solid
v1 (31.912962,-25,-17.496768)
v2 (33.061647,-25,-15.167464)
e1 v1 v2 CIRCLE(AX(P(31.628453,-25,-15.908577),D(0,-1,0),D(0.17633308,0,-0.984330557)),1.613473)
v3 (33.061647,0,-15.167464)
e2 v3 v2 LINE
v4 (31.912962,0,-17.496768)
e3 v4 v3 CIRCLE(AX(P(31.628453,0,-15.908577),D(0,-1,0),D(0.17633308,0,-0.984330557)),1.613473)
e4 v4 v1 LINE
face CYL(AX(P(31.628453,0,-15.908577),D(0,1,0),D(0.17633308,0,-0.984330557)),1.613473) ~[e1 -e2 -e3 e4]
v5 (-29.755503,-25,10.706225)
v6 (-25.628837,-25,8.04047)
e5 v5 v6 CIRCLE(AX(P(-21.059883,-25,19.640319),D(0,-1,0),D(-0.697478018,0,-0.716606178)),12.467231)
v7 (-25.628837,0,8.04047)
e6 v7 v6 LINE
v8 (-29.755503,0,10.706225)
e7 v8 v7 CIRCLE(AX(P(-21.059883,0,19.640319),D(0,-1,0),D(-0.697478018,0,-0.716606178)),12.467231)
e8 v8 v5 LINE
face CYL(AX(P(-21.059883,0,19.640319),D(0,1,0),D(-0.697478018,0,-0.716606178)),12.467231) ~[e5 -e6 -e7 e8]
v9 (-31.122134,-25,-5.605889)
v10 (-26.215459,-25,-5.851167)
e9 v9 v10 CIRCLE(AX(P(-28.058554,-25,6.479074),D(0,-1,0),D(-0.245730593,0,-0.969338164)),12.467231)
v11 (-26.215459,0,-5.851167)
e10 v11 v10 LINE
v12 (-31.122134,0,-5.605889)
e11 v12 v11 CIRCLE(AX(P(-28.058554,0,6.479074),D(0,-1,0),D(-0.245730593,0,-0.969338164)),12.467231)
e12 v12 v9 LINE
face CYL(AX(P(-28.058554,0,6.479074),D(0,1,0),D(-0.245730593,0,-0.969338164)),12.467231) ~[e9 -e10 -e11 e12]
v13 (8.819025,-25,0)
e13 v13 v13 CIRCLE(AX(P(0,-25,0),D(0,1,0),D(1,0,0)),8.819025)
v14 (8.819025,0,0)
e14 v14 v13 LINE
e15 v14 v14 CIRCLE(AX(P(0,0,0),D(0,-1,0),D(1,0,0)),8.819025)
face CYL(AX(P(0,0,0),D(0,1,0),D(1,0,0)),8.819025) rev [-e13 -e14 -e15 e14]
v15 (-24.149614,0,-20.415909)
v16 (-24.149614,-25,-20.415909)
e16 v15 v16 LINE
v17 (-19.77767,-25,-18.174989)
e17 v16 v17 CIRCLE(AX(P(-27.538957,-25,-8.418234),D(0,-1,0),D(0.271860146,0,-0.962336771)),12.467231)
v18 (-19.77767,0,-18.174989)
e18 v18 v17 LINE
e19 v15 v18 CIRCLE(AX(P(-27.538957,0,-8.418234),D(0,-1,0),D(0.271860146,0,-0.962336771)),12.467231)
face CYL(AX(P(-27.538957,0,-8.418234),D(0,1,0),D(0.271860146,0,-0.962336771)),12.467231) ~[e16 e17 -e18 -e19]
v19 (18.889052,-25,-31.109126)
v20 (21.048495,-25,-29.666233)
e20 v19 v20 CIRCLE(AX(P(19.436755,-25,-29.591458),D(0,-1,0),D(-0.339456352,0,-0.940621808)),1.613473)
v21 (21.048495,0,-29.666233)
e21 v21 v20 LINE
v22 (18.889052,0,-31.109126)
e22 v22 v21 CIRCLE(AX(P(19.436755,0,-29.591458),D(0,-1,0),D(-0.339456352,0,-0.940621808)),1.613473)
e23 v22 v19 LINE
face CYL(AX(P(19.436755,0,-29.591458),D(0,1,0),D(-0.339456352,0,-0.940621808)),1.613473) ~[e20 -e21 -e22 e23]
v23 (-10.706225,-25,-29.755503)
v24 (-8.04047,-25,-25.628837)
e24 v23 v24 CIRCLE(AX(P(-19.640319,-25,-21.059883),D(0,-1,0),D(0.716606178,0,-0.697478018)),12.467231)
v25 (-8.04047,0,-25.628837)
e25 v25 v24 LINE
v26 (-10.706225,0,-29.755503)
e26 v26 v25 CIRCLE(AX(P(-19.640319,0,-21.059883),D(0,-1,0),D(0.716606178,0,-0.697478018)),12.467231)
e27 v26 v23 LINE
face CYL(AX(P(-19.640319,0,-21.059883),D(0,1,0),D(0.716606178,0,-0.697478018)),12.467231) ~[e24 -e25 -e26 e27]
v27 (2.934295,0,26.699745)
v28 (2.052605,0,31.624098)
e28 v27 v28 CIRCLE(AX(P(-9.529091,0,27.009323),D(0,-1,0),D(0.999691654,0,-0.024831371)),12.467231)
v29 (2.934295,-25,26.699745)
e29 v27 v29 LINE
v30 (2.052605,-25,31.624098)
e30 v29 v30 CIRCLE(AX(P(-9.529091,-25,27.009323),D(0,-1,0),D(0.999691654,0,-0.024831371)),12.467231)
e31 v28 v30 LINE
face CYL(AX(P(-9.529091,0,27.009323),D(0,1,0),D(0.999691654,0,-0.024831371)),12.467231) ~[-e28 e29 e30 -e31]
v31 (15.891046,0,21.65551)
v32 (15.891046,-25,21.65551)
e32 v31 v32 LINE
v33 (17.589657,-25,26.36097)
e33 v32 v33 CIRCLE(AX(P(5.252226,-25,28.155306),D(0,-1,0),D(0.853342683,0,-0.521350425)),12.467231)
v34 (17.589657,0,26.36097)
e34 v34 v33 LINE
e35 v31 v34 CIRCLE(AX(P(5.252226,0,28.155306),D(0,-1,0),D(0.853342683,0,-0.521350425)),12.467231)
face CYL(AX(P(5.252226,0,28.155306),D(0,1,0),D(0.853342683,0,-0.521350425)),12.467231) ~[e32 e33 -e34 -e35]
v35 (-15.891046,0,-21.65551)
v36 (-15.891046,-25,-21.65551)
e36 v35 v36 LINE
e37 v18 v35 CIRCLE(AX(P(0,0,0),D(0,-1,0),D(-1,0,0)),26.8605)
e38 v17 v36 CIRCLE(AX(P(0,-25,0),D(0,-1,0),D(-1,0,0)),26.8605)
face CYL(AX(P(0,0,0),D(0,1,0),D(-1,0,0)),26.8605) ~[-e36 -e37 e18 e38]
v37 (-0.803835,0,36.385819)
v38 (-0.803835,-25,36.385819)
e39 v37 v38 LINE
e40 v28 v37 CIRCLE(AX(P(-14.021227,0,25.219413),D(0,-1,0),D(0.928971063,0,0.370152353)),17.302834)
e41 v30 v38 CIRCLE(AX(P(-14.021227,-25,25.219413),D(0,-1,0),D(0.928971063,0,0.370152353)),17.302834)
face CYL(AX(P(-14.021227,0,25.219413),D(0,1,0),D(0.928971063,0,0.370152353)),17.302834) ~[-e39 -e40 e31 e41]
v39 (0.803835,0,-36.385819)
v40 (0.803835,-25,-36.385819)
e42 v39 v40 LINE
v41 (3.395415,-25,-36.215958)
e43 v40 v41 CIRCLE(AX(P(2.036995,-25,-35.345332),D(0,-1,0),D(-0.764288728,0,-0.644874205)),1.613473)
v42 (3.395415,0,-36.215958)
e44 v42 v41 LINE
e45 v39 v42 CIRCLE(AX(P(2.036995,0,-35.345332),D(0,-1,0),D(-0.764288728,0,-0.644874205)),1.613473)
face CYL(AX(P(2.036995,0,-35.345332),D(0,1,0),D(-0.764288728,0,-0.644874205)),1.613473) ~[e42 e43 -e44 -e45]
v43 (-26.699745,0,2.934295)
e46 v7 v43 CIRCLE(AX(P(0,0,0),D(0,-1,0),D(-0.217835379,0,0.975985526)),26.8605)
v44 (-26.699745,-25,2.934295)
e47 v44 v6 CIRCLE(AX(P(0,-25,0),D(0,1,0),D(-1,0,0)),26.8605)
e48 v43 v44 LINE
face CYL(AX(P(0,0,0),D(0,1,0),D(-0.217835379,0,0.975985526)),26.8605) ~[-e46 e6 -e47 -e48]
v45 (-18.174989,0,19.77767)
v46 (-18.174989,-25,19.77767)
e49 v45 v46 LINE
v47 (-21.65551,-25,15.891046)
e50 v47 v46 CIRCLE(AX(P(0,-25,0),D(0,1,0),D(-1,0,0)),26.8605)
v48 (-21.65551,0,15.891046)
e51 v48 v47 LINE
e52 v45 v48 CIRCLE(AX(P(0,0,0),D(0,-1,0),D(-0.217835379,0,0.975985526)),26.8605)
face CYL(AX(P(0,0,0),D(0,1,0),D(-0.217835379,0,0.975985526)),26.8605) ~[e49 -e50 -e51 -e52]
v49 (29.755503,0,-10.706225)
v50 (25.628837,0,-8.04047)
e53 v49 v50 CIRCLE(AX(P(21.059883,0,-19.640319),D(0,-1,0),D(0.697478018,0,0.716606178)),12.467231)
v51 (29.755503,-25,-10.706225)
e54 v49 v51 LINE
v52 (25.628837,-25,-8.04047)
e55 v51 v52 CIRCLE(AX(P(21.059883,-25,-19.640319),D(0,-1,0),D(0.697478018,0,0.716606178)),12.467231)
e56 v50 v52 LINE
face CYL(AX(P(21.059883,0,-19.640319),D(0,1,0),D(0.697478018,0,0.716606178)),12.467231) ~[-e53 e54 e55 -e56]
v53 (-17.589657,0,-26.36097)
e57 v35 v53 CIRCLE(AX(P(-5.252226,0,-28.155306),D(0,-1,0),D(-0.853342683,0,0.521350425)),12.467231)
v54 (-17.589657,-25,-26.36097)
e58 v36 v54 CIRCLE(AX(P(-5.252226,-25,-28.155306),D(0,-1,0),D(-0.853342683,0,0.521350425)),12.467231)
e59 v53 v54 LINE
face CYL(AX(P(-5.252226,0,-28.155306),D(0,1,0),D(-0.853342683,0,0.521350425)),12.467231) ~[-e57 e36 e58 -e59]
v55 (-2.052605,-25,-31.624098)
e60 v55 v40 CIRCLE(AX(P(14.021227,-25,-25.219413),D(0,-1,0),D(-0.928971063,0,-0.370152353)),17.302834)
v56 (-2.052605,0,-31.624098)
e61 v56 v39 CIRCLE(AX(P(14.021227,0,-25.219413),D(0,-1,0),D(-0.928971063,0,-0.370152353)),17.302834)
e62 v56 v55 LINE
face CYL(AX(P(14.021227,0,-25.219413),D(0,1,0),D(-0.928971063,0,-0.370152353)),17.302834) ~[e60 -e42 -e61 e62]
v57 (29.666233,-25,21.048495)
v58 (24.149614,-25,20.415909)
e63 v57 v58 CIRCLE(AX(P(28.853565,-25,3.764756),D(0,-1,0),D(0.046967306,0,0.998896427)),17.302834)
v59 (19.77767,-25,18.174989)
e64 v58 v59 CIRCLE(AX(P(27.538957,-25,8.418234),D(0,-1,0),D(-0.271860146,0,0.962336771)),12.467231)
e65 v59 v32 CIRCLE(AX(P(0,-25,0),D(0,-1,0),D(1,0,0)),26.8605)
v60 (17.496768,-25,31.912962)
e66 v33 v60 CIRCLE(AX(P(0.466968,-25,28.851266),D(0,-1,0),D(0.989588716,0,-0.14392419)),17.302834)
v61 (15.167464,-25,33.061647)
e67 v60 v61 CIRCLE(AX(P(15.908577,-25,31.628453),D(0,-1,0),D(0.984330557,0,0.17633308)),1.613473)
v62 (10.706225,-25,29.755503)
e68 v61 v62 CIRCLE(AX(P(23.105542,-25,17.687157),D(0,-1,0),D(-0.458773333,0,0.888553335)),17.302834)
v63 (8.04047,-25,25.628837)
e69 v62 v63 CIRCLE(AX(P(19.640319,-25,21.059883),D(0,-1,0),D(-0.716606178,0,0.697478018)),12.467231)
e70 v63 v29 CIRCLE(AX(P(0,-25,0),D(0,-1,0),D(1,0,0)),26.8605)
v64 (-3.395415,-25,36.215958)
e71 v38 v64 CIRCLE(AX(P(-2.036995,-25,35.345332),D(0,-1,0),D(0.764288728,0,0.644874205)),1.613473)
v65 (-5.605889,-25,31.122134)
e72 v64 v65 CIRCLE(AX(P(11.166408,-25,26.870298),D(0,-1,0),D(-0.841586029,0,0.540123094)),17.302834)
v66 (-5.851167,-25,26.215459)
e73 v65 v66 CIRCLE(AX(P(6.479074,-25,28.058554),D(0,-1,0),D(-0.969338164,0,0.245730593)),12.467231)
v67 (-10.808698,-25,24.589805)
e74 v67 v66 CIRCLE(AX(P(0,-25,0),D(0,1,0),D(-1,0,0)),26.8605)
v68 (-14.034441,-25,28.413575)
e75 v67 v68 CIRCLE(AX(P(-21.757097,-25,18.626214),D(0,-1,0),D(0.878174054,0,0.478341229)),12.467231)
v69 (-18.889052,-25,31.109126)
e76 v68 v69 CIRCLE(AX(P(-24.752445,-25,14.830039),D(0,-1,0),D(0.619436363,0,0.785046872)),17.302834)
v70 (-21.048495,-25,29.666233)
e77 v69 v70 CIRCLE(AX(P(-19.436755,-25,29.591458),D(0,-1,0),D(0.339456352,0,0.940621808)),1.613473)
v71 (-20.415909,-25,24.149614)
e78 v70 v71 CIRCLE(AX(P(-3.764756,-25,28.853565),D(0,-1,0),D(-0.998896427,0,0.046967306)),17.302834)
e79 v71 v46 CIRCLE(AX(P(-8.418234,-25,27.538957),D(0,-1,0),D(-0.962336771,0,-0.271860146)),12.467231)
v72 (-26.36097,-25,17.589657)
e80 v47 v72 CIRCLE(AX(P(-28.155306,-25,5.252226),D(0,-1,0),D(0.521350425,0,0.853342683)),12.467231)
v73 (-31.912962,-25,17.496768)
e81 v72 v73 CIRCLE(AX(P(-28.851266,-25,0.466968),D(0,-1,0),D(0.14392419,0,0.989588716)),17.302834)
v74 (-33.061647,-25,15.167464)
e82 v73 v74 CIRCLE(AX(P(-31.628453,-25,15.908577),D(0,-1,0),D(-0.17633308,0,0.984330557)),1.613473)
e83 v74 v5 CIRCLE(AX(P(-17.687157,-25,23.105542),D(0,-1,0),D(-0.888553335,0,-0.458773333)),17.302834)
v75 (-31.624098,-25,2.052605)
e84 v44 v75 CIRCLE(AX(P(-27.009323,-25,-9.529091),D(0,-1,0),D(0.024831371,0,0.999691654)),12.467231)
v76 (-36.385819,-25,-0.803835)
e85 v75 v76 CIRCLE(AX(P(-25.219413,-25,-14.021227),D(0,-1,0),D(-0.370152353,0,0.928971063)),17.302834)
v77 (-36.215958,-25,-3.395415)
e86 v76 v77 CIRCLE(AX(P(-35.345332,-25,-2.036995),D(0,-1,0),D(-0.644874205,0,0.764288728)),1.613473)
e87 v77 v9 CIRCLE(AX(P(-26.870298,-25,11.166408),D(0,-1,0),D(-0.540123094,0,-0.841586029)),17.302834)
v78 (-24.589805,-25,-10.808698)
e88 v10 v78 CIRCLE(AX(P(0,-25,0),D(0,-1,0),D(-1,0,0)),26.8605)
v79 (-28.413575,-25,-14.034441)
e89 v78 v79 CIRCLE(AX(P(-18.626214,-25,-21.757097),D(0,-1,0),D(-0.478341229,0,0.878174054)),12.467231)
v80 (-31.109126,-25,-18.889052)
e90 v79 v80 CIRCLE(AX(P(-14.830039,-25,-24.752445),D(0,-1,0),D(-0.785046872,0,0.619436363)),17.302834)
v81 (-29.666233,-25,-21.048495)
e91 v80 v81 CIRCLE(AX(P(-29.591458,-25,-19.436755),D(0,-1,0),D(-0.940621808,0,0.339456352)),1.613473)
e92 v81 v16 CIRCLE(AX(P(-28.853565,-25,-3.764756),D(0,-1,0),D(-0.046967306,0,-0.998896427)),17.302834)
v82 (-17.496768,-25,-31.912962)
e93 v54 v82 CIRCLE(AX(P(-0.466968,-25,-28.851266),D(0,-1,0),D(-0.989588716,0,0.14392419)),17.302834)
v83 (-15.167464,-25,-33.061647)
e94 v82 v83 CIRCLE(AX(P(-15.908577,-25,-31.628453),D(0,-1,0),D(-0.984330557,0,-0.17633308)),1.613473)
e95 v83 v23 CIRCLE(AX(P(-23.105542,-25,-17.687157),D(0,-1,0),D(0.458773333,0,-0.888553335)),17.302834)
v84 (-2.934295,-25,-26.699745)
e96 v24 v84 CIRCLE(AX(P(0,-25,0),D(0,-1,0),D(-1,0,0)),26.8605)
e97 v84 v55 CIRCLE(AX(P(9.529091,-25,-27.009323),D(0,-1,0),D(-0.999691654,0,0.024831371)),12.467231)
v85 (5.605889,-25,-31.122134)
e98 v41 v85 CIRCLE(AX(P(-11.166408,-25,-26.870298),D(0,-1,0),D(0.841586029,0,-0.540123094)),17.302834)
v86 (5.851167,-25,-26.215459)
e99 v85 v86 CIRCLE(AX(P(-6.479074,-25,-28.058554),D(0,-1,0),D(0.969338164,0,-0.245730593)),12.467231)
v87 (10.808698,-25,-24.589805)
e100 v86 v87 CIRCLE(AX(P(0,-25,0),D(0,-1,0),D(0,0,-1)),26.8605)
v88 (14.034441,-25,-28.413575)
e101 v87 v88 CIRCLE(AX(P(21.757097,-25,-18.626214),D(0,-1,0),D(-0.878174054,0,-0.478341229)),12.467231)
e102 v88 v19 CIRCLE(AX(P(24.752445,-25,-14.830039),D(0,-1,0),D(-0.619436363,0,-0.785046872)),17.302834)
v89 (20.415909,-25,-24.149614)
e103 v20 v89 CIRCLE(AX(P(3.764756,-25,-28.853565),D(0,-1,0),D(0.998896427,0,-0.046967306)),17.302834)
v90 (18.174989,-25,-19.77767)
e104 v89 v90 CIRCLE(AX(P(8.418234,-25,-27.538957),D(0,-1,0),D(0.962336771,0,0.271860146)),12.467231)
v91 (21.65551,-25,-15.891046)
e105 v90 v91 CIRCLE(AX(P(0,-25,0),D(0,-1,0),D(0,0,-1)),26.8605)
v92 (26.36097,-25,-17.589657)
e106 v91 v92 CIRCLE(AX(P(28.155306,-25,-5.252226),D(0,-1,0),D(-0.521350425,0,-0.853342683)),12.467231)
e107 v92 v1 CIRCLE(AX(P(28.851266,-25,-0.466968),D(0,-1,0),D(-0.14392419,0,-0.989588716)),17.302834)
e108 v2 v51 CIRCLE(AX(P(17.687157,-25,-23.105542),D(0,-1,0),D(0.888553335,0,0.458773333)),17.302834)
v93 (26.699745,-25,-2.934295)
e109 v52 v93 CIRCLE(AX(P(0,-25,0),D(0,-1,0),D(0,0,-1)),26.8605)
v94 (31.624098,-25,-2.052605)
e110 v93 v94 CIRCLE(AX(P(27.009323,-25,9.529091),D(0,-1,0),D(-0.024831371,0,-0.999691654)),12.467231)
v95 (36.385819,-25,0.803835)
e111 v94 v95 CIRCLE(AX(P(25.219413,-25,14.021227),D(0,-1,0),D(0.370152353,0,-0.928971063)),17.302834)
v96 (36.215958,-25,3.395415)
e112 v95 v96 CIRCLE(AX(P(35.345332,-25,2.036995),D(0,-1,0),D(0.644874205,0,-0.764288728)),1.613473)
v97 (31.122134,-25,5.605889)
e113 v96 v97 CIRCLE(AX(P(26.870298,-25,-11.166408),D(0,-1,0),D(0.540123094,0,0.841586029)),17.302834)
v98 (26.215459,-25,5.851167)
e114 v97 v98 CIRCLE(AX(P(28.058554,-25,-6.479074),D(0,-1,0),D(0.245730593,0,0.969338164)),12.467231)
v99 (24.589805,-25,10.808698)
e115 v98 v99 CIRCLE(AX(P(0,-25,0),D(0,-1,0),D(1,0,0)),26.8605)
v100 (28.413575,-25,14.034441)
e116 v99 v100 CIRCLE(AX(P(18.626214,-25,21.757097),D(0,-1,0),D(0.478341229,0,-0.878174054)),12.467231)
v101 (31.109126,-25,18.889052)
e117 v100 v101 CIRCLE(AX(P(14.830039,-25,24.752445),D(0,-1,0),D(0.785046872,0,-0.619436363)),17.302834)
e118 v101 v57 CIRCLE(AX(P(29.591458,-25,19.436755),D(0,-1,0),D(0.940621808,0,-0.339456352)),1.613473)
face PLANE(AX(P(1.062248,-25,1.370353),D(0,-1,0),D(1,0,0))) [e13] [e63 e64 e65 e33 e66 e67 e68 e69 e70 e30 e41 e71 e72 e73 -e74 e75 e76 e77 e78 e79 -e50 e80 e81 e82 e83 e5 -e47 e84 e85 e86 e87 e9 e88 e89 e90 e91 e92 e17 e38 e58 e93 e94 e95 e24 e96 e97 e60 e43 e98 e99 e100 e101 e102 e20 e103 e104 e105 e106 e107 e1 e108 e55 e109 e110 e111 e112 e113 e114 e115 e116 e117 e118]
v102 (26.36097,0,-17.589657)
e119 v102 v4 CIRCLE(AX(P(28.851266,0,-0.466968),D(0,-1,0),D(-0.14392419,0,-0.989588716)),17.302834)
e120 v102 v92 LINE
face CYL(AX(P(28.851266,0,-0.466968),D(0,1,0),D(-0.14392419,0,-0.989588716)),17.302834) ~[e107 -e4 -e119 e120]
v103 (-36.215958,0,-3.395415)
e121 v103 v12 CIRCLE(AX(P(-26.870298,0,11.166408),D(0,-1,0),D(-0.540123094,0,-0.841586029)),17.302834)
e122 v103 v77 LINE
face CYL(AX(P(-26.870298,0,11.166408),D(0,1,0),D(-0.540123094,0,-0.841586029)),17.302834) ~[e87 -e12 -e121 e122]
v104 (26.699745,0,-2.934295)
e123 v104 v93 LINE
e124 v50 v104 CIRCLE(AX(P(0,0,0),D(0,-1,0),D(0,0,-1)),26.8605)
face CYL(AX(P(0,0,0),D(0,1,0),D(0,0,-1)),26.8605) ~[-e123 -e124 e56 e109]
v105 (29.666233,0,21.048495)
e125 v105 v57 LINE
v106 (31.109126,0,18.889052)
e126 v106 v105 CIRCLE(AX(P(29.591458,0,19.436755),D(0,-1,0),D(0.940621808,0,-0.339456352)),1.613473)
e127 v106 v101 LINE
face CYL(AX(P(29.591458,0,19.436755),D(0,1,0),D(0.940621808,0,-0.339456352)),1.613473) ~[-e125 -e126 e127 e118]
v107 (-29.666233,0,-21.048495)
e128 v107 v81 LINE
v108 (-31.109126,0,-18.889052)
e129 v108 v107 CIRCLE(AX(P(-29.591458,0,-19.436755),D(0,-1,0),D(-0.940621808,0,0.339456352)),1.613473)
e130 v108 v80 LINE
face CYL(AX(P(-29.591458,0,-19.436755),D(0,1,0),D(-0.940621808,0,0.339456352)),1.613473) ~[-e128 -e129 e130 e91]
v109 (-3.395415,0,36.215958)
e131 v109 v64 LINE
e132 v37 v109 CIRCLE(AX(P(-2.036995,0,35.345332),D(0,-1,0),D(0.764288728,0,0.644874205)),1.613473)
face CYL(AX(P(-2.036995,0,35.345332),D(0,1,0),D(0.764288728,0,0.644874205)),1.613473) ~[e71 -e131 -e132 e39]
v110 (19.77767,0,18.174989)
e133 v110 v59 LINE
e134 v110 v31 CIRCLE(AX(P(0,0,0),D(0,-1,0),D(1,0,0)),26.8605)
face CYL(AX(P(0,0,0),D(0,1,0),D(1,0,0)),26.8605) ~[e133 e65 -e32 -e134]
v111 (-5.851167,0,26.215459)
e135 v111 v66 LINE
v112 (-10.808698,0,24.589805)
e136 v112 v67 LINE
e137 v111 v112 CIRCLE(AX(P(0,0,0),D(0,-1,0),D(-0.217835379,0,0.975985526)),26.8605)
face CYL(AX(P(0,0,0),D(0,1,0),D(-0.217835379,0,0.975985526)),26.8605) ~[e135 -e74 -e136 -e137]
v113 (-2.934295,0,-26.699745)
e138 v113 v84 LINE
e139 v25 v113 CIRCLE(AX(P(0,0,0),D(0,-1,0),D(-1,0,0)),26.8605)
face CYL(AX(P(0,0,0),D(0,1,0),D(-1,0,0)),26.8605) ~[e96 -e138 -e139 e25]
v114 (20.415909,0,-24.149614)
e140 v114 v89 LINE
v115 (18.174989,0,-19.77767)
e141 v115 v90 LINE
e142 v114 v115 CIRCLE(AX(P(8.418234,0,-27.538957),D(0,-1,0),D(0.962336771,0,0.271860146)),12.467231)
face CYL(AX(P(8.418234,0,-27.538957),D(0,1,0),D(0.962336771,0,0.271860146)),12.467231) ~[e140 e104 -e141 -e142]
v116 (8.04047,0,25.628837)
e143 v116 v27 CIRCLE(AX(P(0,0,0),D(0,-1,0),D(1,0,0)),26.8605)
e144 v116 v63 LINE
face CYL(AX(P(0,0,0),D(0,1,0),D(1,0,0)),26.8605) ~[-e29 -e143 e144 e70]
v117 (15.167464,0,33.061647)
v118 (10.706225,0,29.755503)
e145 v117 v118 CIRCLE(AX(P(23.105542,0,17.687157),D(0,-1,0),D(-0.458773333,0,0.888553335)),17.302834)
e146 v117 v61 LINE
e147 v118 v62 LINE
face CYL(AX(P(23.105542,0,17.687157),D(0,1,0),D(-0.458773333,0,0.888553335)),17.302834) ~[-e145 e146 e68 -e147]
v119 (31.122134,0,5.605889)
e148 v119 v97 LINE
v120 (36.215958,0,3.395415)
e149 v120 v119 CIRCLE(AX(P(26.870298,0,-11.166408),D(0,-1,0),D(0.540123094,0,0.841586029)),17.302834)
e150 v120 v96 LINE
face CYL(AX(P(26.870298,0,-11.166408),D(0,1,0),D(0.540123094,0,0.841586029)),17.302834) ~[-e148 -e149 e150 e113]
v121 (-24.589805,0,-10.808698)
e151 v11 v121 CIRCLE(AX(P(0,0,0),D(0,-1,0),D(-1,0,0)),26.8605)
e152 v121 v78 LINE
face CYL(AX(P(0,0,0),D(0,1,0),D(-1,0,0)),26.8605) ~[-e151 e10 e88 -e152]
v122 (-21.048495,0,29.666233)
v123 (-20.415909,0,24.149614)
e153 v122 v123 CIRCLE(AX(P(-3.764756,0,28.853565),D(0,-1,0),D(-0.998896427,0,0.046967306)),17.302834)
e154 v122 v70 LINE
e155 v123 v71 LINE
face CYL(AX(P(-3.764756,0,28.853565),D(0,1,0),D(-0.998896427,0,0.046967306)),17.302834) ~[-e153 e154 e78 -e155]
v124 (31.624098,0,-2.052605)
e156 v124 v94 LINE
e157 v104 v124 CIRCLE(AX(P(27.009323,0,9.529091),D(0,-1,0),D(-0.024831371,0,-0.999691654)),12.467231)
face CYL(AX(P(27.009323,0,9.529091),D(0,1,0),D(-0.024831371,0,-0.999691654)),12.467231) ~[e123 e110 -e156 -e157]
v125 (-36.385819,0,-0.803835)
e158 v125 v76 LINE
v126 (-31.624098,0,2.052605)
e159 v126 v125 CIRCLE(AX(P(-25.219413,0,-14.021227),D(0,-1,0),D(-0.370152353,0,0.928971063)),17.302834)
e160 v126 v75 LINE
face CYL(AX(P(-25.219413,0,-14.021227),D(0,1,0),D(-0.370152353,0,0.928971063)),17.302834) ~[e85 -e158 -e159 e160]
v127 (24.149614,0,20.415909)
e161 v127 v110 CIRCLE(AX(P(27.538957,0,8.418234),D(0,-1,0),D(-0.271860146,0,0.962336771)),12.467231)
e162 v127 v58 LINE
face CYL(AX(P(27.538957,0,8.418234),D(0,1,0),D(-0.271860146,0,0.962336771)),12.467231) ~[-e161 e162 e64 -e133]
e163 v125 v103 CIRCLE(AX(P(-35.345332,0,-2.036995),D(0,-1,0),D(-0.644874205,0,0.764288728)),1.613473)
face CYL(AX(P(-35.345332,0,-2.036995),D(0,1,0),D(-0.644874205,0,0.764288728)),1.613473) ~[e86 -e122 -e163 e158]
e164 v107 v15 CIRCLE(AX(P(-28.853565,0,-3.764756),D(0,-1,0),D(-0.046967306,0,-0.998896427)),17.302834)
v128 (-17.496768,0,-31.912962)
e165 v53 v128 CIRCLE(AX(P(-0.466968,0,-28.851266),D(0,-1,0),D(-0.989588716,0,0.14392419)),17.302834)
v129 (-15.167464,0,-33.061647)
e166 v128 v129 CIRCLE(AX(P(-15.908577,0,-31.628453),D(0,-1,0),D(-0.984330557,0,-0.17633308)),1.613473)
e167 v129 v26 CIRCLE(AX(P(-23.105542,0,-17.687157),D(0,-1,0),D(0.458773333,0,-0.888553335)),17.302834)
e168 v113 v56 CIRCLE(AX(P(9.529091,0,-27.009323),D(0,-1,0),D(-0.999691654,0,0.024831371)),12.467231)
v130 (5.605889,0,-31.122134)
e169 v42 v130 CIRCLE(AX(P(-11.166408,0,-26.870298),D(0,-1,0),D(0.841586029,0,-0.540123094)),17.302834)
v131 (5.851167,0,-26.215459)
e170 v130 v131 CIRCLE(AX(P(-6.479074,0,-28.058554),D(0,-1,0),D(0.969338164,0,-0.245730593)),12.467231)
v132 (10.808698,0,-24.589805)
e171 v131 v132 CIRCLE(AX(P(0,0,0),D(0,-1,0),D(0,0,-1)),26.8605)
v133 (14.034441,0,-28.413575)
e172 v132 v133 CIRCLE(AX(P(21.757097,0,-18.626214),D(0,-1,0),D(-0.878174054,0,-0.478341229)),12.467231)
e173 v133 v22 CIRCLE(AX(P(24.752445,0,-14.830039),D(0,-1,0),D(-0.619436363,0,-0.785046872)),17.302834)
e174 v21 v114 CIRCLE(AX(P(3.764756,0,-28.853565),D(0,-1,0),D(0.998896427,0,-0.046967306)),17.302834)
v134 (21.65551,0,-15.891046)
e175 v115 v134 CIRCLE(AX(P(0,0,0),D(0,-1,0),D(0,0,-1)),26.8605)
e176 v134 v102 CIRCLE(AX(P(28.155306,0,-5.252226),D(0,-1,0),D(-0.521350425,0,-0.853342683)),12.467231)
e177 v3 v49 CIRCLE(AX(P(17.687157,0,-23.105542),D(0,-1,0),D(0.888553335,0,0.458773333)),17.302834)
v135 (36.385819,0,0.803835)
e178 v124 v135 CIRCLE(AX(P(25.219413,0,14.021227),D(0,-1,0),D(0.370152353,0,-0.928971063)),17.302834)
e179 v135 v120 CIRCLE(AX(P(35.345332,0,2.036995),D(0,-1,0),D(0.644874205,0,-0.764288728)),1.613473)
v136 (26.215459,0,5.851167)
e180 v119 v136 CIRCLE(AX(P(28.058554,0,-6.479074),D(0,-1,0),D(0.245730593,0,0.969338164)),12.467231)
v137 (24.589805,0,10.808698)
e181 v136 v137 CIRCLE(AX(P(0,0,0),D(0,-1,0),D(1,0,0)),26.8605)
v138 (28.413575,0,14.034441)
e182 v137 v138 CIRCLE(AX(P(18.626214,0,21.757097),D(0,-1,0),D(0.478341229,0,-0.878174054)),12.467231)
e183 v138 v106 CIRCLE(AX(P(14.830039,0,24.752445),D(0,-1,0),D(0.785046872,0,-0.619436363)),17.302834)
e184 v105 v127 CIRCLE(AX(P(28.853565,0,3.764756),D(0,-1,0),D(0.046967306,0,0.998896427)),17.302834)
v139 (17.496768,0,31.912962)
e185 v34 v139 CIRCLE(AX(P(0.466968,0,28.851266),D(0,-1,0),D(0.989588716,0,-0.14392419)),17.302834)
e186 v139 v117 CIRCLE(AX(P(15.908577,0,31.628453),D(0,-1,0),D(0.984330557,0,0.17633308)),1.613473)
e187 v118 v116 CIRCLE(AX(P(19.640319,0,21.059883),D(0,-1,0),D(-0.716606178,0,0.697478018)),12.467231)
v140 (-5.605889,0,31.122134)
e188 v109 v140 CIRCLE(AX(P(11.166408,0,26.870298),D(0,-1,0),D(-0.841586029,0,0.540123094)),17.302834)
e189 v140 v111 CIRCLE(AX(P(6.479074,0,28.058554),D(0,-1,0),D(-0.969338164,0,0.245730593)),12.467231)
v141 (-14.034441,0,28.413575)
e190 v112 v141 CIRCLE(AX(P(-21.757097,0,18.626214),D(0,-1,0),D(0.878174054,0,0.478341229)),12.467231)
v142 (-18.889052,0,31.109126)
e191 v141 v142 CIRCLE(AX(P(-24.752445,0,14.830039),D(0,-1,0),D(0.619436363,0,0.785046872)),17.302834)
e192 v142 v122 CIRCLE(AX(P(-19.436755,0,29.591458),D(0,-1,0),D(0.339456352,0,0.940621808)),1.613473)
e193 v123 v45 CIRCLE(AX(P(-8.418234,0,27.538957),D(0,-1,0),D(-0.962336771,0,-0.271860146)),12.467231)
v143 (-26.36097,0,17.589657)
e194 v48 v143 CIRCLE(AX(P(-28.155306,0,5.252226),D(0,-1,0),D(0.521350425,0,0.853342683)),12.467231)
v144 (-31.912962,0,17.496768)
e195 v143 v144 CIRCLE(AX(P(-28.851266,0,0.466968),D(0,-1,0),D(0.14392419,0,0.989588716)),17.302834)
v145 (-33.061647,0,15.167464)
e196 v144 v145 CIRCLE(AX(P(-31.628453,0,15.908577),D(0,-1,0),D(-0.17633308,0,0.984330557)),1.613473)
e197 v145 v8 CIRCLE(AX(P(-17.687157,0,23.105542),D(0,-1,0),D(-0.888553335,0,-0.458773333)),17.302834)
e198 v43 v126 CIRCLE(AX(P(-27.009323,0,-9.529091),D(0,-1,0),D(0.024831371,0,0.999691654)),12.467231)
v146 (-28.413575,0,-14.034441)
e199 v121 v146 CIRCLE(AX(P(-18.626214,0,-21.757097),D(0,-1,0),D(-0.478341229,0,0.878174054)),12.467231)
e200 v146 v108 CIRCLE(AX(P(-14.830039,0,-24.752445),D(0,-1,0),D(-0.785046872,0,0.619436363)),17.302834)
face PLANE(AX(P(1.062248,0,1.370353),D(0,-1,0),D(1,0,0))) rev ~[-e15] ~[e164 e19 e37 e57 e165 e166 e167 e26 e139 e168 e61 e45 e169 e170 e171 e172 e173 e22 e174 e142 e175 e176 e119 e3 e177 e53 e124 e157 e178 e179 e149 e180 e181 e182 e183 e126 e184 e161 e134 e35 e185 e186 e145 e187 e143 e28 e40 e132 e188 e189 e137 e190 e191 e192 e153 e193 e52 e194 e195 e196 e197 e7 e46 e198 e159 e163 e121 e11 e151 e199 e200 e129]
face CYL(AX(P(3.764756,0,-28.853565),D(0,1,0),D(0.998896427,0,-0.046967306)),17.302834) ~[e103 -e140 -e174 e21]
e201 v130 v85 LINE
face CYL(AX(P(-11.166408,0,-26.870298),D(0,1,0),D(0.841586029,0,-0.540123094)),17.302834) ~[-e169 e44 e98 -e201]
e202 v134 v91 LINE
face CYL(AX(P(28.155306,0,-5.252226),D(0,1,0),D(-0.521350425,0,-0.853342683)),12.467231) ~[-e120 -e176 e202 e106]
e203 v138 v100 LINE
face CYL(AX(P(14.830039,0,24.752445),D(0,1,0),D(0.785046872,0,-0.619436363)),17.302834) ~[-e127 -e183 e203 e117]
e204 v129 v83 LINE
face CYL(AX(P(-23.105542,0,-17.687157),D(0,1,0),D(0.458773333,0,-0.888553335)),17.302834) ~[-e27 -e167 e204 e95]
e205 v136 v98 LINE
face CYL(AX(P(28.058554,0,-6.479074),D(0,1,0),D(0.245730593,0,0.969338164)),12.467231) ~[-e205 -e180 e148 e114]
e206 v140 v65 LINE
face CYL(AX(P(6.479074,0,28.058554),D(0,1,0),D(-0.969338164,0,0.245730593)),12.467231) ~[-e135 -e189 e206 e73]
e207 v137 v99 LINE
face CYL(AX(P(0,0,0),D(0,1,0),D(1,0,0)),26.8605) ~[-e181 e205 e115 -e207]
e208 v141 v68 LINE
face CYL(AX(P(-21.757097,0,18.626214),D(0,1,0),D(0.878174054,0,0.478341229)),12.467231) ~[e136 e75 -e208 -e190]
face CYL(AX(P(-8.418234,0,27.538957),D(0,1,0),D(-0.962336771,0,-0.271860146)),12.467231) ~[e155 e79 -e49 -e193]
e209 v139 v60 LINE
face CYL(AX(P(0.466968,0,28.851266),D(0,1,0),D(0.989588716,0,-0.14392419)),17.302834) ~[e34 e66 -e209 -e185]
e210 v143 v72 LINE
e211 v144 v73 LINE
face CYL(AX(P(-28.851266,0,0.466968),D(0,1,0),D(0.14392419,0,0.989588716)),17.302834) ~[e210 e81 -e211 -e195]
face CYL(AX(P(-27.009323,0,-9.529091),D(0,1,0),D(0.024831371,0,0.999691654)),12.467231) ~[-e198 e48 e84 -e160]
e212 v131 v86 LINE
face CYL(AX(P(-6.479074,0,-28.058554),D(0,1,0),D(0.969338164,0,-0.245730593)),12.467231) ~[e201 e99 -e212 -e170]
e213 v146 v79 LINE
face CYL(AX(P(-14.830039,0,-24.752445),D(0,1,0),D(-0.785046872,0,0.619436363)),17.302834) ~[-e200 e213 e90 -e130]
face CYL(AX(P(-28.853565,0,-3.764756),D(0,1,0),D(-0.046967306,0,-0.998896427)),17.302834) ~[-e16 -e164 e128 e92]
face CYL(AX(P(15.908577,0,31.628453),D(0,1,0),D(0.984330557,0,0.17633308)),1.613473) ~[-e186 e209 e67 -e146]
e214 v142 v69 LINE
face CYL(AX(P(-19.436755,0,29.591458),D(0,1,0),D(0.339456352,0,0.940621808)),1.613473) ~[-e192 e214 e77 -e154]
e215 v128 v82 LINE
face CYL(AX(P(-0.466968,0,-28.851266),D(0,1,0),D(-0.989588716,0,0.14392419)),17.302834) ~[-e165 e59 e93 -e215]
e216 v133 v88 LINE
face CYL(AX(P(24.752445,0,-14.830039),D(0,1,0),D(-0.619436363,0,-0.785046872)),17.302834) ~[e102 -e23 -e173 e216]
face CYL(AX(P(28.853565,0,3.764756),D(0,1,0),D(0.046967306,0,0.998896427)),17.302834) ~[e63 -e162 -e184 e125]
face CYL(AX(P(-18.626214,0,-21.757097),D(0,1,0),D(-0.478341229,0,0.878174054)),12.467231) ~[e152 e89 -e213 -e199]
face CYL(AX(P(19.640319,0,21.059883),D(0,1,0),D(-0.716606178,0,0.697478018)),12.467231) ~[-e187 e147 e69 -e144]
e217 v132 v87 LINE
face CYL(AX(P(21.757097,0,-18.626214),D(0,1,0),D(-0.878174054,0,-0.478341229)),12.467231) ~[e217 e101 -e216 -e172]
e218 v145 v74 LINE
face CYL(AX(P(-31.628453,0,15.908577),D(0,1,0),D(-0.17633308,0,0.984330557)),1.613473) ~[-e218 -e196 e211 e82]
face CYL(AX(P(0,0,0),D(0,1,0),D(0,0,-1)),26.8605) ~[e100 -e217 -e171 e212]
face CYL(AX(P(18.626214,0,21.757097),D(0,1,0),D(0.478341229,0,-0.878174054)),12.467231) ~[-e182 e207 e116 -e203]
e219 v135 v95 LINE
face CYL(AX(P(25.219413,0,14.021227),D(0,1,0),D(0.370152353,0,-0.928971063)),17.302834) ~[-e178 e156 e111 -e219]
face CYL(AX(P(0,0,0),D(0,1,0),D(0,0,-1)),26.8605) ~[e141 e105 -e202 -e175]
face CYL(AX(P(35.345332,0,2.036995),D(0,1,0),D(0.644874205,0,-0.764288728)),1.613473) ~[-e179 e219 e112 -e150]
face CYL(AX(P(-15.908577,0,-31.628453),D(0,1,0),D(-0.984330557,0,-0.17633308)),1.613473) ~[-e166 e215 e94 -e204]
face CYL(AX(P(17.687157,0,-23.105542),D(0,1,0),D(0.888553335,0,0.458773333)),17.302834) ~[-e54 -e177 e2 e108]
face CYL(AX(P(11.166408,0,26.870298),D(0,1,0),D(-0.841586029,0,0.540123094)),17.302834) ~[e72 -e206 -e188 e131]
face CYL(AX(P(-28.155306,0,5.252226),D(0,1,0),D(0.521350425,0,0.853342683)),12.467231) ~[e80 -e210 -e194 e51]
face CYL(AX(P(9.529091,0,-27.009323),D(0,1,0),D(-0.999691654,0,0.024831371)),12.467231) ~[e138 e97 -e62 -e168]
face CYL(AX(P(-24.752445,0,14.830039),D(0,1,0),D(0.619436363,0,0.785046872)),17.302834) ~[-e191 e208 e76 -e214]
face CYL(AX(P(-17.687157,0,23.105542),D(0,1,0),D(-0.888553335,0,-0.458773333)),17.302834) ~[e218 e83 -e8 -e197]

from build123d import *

# Parameters (mm, degrees)
F0_R     = 8.8190251349
F1_DEPTH = 25
F2_COUNT = 12


# Not quite as in the source:
# - a feature names something its author has since deleted; it is built from what else it names


with BuildPart() as f1:
    # F0 (on Front) → F1 (new body)
    with BuildSketch(Plane.XZ):
        with BuildLine():
            ThreePointArc((-5.8511671906, 26.2154592323), (-16.7976364993, -20.9601018196), (26.8605, 0))
            ThreePointArc((26.8605, 0), (20.0037882945, 17.9258169722), (2.9342950433, 26.6997448087))
            ThreePointArc((2.9342950433, 26.6997448087), (-1.4784007951, 26.8197835811), (-5.8511671906, 26.2154592323))
        make_face()
        Circle(F0_R, mode=Mode.SUBTRACT)
        with BuildLine():
            ThreePointArc((-5.8511671906, 26.2154592323), (-1.4784007951, 26.8197835811), (2.9342950433, 26.6997448087))
            ThreePointArc((2.9342950433, 26.6997448087), (2.7429832933, 29.2065995461), (2.0526051191, 31.6240980128))
            ThreePointArc((2.0526051191, 31.6240980128), (0.8166449435, 34.1202908544), (-0.8038354447, 36.3858193952))
            ThreePointArc((-0.8038354447, 36.3858193952), (-2.1425207788, 36.9553506751), (-3.3954147249, 36.215958315))
            ThreePointArc((-3.3954147249, 36.215958315), (-4.7063208649, 33.7582965503), (-5.6058886832, 31.122133809))
            ThreePointArc((-5.6058886832, 31.122133809), (-5.9726089783, 28.6809978257), (-5.8511671906, 26.2154592323))
        make_face()
    extrude(amount=F1_DEPTH)

    # F2: F1 ×12 about axis
    f2_axis = Axis((0, 0, 0), (0, 1, 0))


with BuildPart() as f1_1:
    add(f1.part)
    for i in range(1, F2_COUNT):
        add(f1.part.rotate(f2_axis, i * 360 / F2_COUNT))


solid = f1_1.part
